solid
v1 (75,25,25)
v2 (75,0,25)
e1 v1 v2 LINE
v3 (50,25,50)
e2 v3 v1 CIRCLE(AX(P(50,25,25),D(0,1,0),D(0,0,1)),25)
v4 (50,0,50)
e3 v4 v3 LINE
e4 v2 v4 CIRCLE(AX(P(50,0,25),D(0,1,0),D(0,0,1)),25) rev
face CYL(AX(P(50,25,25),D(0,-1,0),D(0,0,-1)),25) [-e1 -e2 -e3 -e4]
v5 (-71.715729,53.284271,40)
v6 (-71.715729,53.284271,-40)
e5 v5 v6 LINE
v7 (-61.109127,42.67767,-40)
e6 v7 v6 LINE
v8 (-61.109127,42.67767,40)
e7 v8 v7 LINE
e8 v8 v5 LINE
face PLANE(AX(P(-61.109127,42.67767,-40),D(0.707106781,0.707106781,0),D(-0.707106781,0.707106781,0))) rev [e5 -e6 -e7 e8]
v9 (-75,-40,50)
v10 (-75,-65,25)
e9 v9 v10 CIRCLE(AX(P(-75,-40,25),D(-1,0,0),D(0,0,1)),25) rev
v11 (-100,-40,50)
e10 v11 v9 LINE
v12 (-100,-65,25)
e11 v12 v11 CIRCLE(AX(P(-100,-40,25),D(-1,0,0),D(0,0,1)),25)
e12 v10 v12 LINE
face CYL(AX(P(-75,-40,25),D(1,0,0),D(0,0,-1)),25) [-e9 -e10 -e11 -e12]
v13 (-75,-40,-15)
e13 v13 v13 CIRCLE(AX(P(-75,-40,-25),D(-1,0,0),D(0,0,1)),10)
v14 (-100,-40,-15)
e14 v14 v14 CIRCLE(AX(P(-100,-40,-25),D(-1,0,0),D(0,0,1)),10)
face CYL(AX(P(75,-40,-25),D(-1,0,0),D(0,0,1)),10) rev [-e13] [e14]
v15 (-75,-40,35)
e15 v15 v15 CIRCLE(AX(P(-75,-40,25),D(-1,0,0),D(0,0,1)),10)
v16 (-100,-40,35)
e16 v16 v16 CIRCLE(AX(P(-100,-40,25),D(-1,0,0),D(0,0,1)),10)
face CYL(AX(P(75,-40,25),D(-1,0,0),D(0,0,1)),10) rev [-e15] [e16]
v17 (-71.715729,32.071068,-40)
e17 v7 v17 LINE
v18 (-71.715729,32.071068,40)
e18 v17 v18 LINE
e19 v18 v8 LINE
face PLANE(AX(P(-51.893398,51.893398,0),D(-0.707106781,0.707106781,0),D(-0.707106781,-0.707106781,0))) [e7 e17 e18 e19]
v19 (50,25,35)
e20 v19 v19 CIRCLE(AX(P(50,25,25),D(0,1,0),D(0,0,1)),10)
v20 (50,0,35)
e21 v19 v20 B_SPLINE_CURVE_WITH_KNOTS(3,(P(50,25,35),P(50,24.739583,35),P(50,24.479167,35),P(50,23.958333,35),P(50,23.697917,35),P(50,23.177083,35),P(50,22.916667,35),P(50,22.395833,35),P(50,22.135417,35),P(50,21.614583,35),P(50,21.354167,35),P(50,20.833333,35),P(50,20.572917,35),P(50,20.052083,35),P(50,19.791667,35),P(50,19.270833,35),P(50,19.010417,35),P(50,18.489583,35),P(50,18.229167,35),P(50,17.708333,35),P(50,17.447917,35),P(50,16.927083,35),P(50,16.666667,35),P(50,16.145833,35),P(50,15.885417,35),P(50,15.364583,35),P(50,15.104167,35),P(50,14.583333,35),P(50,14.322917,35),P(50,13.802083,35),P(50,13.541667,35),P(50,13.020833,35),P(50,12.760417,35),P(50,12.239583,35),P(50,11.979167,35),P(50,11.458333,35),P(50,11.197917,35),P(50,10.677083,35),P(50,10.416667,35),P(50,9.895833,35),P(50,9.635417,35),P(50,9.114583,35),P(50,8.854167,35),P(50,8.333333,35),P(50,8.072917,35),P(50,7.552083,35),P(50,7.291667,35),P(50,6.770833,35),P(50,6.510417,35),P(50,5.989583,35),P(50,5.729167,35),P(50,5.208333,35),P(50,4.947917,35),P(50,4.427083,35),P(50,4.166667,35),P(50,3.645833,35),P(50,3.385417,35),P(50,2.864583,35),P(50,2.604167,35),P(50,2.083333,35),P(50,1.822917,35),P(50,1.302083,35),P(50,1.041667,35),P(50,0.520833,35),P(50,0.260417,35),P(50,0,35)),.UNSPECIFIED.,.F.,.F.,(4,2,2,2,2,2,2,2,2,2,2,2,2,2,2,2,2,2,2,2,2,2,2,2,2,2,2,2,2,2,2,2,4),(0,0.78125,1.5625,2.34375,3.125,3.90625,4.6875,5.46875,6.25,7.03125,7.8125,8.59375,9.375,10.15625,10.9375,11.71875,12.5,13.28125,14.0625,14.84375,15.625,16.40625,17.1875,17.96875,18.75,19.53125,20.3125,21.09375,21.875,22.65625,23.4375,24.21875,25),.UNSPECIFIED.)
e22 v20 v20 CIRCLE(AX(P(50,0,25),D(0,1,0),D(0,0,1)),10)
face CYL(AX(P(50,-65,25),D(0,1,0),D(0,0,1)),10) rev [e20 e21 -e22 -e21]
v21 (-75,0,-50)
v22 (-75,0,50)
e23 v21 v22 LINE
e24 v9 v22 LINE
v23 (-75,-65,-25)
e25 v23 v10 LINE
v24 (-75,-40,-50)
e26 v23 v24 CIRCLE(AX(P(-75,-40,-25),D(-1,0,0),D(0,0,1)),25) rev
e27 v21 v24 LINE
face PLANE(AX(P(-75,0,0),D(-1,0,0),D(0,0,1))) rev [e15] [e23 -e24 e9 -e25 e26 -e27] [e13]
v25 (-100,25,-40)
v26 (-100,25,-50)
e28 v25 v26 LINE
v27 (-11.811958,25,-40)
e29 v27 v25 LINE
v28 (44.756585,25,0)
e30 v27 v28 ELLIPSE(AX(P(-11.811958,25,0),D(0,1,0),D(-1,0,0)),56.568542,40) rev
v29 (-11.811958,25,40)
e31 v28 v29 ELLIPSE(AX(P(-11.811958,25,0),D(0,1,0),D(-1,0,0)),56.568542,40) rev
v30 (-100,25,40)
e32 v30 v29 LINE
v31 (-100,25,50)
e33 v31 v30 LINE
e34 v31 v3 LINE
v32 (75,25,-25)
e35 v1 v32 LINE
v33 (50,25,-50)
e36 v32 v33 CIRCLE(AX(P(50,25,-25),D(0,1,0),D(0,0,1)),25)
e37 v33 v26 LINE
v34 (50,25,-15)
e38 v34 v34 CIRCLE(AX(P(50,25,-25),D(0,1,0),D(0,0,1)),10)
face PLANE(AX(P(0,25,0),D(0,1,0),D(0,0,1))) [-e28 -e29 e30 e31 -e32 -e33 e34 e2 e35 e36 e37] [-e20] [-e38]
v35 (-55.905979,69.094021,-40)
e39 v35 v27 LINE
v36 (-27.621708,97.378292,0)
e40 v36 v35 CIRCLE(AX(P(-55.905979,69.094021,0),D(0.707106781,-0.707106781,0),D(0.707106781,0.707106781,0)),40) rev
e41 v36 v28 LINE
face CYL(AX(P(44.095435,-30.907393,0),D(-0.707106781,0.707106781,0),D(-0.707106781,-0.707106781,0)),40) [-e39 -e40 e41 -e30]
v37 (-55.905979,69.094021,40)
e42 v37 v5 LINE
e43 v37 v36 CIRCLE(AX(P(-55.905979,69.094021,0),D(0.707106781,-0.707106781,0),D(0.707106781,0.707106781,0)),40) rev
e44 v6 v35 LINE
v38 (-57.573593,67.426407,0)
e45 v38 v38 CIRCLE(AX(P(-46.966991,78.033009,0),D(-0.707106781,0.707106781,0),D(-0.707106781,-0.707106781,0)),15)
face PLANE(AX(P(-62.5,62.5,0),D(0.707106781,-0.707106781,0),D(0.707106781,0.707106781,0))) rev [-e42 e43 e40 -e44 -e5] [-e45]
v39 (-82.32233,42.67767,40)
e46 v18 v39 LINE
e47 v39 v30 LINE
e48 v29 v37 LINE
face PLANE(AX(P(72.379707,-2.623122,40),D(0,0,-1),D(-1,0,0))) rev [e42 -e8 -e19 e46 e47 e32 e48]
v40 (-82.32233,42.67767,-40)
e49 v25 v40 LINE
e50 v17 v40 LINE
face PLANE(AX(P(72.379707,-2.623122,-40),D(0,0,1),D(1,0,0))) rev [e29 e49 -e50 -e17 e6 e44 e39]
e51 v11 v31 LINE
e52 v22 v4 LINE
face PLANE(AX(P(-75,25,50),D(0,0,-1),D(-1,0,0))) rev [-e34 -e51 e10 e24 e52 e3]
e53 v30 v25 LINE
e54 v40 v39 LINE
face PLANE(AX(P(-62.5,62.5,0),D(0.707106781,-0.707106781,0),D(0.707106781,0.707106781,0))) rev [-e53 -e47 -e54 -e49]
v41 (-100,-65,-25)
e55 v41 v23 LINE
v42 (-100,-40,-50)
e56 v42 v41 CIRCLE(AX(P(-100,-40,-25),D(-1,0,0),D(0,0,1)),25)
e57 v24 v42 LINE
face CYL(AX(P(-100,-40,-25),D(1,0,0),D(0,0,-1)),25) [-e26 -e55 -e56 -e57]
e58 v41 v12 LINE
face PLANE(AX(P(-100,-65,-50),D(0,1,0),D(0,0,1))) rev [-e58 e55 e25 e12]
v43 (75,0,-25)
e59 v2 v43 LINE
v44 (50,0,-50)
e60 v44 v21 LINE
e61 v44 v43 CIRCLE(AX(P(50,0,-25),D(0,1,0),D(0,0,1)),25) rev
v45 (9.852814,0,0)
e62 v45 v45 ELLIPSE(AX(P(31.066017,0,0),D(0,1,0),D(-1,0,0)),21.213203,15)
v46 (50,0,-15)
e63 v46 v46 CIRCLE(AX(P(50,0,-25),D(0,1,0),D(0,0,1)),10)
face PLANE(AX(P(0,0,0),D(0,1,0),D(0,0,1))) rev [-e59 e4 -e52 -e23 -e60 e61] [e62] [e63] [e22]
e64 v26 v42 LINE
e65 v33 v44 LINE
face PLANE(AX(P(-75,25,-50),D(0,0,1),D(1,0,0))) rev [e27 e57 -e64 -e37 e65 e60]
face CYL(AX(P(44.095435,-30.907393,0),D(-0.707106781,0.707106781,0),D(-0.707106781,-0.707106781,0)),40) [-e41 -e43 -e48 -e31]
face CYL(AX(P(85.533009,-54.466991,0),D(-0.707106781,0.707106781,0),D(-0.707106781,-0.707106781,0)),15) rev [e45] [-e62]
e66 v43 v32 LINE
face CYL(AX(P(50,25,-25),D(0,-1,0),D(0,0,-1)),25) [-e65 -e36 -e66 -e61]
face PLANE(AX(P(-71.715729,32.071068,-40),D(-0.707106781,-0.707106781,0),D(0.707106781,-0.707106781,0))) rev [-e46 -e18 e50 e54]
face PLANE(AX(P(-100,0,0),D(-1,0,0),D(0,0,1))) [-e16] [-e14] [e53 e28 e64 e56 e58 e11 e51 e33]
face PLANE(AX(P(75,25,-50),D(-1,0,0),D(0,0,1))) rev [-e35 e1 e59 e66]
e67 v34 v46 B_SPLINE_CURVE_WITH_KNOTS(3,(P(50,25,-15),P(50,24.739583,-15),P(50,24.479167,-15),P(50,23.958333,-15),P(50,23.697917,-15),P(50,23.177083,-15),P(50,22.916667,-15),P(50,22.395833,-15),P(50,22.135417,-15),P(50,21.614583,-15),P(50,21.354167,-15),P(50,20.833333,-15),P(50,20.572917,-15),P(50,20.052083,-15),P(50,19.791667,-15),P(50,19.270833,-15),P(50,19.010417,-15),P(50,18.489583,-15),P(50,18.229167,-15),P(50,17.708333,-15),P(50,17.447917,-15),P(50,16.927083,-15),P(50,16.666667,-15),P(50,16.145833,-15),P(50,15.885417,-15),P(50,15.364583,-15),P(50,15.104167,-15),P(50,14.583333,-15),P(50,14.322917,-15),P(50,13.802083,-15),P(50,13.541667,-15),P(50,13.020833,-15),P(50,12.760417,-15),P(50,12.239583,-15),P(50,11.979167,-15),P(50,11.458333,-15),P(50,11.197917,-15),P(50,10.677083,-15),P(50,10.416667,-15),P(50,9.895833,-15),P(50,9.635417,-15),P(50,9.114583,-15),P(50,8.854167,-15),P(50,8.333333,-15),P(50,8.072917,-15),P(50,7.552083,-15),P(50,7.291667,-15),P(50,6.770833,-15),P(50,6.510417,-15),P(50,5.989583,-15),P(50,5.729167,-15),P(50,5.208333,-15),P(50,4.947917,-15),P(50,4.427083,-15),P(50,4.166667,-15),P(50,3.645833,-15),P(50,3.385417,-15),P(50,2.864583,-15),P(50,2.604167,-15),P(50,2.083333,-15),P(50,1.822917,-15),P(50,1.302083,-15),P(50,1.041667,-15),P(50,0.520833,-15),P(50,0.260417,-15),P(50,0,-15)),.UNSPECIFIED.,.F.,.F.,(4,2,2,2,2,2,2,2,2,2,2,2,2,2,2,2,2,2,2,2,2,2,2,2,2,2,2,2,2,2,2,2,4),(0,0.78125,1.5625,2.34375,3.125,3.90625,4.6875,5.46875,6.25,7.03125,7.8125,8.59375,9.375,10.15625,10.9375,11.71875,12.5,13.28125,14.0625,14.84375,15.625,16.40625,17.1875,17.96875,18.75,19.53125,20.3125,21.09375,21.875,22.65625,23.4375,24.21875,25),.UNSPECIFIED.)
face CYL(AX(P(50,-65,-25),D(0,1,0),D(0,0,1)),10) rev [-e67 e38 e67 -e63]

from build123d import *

# Parameters (mm, degrees)
SKETCH1_W           = 150
SKETCH1_H           = 100
BOSS_EXTRUDE1_DEPTH = 25
SKETCH2_W           = 100
SKETCH2_H           = 90
BOSS_EXTRUDE2_DEPTH = 25
FILLET1_R           = 25
BOSS_EXTRUDE3_REACH = 196.068
SKETCH5_W           = 80
SKETCH5_H           = 102.358362639
SKETCH6_W           = 80
SKETCH6_H           = 15
CUT_EXTRUDE1_DEPTH  = 15
SKETCH7_R           = 15
CUT_EXTRUDE2_DEPTH  = 195.068286951
SKETCH8_R           = 10
CUT_EXTRUDE3_DEPTH  = 144.527000944
SKETCH9_R           = 10
CUT_EXTRUDE4_DEPTH  = 207.415919487
FILLET4_R           = 40


with BuildPart() as part:
    # Sketch1 → Boss-Extrude1 (new body)
    with BuildSketch(Plane(origin=(0, 0, 0), x_dir=(1, 0, 0), z_dir=(0, 1, 0))):
        Rectangle(SKETCH1_W, SKETCH1_H)
    extrude(amount=BOSS_EXTRUDE1_DEPTH)

    # Sketch2 → Boss-Extrude2 (add)
    with BuildSketch(Plane.ZY.offset(75)):
        with Locations((0, -20)):
            Rectangle(SKETCH2_W, SKETCH2_H)
    extrude(amount=BOSS_EXTRUDE2_DEPTH)

    # Fillet1
    fillet1_edges = [part.edges().sort_by_distance(p)[0] for p in [
        (-87.5, -65, -50),
        (-87.5, -65, 50),
        (75, 12.5, 50),
        (75, 12.5, -50),
    ]]
    fillet(fillet1_edges, radius=FILLET1_R)

    # Sketch5 → Boss-Extrude3 (add, up to next)
    with BuildSketch(Plane(origin=(-62.5, 62.5, 0), x_dir=(0, 0, -1), z_dir=(0.7071067811865438, -0.7071067811865512, 0)), mode=Mode.PRIVATE) as boss_extrude3_sk1:
        with Locations((0, -1.85382727)):
            Rectangle(SKETCH5_W, SKETCH5_H)
    boss_extrude3_tool1 = extrude(boss_extrude3_sk1.sketch, amount=BOSS_EXTRUDE3_REACH, mode=Mode.PRIVATE) - part.part
    add(boss_extrude3_tool1.solids().sort_by_distance((-63.810854, 61.189146, 0))[0])

    # Sketch6 → Cut-Extrude1 (cut)
    with BuildSketch(Plane(origin=(-62.5, 62.5, 0), x_dir=(0, 0, 1), z_dir=(-0.7071067811865438, 0.7071067811865513, 0))):
        with Locations((0, -20.533008589)):
            Rectangle(SKETCH6_W, SKETCH6_H)
    extrude(amount=-CUT_EXTRUDE1_DEPTH, mode=Mode.SUBTRACT)

    # Sketch7 → Cut-Extrude2 (cut, through all)
    with BuildSketch(Plane(origin=(-62.5, 62.5, 0), x_dir=(0.7071067811865513, 0.7071067811865438, 0), z_dir=(-0.7071067811865438, 0.7071067811865513, 0))):
        with Locations(Location((21.966991411, 0, 0), (0, 0, 180))):
            Circle(SKETCH7_R)
    extrude(amount=-CUT_EXTRUDE2_DEPTH, mode=Mode.SUBTRACT)

    # Sketch8 → Cut-Extrude3 (cut, through all)
    with BuildSketch(Plane(origin=(0, 25, 0), x_dir=(1, 0, 0), z_dir=(0, 1, 0))):
        with Locations(Location((50, 25, 0), (0, 0, 270))):
            Circle(SKETCH8_R)
        with Locations(Location((50, -25, 0), (0, 0, 270))):
            Circle(SKETCH8_R)
    extrude(amount=-CUT_EXTRUDE3_DEPTH, mode=Mode.SUBTRACT)

    # Sketch9 → Cut-Extrude4 (cut, through all)
    with BuildSketch(Plane.ZY.offset(100)):
        with Locations((-25, -40)):
            Circle(SKETCH9_R)
        with Locations((25, -40)):
            Circle(SKETCH9_R)
    extrude(amount=-CUT_EXTRUDE4_DEPTH, mode=Mode.SUBTRACT)

    # Fillet4
    # the kernel refuses this fillet: 40 mm, written as the material it takes off along each edge
    with BuildSketch(Plane(origin=(-98.332385785, 168.088970452, -40), x_dir=(-0.7071067811865511, -0.7071067811865437, 0), z_dir=(0.7071067811865438, -0.7071067811865512, 0))) as fillet4_piece_1_section:
        with BuildLine():
            CenterArc((FILLET4_R, -FILLET4_R), FILLET4_R, 90, 90)
            Line((0, -FILLET4_R), (0, 0))
            Line((0, 0), (FILLET4_R, 0))
        make_face()
    fillet4_piece_1 = extrude(amount=302.358362639, mode=Mode.PRIVATE)
    fillet4_piece_1 = split(fillet4_piece_1, bisect_by=Plane(origin=(-0.418025546, 25, -30.730970788), z_dir=(0, 1, 0)), keep=Keep.TOP, mode=Mode.PRIVATE)
    add(fillet4_piece_1, mode=Mode.SUBTRACT)
    with BuildSketch(Plane(origin=(-98.332385785, 168.088970452, 40), x_dir=(0, 0, -1), z_dir=(0.7071067811865438, -0.7071067811865512, 0))) as fillet4_piece_2_section:
        with BuildLine():
            CenterArc((FILLET4_R, -FILLET4_R), FILLET4_R, 90, 90)
            Line((0, -FILLET4_R), (0, 0))
            Line((0, 0), (FILLET4_R, 0))
        make_face()
    fillet4_piece_2 = extrude(amount=302.358362639, mode=Mode.PRIVATE)
    fillet4_piece_2 = split(fillet4_piece_2, bisect_by=Plane(origin=(-0.418025546, 25, 30.730970789), z_dir=(0, 1, 0)), keep=Keep.TOP, mode=Mode.PRIVATE)
    add(fillet4_piece_2, mode=Mode.SUBTRACT)


solid = part.part
